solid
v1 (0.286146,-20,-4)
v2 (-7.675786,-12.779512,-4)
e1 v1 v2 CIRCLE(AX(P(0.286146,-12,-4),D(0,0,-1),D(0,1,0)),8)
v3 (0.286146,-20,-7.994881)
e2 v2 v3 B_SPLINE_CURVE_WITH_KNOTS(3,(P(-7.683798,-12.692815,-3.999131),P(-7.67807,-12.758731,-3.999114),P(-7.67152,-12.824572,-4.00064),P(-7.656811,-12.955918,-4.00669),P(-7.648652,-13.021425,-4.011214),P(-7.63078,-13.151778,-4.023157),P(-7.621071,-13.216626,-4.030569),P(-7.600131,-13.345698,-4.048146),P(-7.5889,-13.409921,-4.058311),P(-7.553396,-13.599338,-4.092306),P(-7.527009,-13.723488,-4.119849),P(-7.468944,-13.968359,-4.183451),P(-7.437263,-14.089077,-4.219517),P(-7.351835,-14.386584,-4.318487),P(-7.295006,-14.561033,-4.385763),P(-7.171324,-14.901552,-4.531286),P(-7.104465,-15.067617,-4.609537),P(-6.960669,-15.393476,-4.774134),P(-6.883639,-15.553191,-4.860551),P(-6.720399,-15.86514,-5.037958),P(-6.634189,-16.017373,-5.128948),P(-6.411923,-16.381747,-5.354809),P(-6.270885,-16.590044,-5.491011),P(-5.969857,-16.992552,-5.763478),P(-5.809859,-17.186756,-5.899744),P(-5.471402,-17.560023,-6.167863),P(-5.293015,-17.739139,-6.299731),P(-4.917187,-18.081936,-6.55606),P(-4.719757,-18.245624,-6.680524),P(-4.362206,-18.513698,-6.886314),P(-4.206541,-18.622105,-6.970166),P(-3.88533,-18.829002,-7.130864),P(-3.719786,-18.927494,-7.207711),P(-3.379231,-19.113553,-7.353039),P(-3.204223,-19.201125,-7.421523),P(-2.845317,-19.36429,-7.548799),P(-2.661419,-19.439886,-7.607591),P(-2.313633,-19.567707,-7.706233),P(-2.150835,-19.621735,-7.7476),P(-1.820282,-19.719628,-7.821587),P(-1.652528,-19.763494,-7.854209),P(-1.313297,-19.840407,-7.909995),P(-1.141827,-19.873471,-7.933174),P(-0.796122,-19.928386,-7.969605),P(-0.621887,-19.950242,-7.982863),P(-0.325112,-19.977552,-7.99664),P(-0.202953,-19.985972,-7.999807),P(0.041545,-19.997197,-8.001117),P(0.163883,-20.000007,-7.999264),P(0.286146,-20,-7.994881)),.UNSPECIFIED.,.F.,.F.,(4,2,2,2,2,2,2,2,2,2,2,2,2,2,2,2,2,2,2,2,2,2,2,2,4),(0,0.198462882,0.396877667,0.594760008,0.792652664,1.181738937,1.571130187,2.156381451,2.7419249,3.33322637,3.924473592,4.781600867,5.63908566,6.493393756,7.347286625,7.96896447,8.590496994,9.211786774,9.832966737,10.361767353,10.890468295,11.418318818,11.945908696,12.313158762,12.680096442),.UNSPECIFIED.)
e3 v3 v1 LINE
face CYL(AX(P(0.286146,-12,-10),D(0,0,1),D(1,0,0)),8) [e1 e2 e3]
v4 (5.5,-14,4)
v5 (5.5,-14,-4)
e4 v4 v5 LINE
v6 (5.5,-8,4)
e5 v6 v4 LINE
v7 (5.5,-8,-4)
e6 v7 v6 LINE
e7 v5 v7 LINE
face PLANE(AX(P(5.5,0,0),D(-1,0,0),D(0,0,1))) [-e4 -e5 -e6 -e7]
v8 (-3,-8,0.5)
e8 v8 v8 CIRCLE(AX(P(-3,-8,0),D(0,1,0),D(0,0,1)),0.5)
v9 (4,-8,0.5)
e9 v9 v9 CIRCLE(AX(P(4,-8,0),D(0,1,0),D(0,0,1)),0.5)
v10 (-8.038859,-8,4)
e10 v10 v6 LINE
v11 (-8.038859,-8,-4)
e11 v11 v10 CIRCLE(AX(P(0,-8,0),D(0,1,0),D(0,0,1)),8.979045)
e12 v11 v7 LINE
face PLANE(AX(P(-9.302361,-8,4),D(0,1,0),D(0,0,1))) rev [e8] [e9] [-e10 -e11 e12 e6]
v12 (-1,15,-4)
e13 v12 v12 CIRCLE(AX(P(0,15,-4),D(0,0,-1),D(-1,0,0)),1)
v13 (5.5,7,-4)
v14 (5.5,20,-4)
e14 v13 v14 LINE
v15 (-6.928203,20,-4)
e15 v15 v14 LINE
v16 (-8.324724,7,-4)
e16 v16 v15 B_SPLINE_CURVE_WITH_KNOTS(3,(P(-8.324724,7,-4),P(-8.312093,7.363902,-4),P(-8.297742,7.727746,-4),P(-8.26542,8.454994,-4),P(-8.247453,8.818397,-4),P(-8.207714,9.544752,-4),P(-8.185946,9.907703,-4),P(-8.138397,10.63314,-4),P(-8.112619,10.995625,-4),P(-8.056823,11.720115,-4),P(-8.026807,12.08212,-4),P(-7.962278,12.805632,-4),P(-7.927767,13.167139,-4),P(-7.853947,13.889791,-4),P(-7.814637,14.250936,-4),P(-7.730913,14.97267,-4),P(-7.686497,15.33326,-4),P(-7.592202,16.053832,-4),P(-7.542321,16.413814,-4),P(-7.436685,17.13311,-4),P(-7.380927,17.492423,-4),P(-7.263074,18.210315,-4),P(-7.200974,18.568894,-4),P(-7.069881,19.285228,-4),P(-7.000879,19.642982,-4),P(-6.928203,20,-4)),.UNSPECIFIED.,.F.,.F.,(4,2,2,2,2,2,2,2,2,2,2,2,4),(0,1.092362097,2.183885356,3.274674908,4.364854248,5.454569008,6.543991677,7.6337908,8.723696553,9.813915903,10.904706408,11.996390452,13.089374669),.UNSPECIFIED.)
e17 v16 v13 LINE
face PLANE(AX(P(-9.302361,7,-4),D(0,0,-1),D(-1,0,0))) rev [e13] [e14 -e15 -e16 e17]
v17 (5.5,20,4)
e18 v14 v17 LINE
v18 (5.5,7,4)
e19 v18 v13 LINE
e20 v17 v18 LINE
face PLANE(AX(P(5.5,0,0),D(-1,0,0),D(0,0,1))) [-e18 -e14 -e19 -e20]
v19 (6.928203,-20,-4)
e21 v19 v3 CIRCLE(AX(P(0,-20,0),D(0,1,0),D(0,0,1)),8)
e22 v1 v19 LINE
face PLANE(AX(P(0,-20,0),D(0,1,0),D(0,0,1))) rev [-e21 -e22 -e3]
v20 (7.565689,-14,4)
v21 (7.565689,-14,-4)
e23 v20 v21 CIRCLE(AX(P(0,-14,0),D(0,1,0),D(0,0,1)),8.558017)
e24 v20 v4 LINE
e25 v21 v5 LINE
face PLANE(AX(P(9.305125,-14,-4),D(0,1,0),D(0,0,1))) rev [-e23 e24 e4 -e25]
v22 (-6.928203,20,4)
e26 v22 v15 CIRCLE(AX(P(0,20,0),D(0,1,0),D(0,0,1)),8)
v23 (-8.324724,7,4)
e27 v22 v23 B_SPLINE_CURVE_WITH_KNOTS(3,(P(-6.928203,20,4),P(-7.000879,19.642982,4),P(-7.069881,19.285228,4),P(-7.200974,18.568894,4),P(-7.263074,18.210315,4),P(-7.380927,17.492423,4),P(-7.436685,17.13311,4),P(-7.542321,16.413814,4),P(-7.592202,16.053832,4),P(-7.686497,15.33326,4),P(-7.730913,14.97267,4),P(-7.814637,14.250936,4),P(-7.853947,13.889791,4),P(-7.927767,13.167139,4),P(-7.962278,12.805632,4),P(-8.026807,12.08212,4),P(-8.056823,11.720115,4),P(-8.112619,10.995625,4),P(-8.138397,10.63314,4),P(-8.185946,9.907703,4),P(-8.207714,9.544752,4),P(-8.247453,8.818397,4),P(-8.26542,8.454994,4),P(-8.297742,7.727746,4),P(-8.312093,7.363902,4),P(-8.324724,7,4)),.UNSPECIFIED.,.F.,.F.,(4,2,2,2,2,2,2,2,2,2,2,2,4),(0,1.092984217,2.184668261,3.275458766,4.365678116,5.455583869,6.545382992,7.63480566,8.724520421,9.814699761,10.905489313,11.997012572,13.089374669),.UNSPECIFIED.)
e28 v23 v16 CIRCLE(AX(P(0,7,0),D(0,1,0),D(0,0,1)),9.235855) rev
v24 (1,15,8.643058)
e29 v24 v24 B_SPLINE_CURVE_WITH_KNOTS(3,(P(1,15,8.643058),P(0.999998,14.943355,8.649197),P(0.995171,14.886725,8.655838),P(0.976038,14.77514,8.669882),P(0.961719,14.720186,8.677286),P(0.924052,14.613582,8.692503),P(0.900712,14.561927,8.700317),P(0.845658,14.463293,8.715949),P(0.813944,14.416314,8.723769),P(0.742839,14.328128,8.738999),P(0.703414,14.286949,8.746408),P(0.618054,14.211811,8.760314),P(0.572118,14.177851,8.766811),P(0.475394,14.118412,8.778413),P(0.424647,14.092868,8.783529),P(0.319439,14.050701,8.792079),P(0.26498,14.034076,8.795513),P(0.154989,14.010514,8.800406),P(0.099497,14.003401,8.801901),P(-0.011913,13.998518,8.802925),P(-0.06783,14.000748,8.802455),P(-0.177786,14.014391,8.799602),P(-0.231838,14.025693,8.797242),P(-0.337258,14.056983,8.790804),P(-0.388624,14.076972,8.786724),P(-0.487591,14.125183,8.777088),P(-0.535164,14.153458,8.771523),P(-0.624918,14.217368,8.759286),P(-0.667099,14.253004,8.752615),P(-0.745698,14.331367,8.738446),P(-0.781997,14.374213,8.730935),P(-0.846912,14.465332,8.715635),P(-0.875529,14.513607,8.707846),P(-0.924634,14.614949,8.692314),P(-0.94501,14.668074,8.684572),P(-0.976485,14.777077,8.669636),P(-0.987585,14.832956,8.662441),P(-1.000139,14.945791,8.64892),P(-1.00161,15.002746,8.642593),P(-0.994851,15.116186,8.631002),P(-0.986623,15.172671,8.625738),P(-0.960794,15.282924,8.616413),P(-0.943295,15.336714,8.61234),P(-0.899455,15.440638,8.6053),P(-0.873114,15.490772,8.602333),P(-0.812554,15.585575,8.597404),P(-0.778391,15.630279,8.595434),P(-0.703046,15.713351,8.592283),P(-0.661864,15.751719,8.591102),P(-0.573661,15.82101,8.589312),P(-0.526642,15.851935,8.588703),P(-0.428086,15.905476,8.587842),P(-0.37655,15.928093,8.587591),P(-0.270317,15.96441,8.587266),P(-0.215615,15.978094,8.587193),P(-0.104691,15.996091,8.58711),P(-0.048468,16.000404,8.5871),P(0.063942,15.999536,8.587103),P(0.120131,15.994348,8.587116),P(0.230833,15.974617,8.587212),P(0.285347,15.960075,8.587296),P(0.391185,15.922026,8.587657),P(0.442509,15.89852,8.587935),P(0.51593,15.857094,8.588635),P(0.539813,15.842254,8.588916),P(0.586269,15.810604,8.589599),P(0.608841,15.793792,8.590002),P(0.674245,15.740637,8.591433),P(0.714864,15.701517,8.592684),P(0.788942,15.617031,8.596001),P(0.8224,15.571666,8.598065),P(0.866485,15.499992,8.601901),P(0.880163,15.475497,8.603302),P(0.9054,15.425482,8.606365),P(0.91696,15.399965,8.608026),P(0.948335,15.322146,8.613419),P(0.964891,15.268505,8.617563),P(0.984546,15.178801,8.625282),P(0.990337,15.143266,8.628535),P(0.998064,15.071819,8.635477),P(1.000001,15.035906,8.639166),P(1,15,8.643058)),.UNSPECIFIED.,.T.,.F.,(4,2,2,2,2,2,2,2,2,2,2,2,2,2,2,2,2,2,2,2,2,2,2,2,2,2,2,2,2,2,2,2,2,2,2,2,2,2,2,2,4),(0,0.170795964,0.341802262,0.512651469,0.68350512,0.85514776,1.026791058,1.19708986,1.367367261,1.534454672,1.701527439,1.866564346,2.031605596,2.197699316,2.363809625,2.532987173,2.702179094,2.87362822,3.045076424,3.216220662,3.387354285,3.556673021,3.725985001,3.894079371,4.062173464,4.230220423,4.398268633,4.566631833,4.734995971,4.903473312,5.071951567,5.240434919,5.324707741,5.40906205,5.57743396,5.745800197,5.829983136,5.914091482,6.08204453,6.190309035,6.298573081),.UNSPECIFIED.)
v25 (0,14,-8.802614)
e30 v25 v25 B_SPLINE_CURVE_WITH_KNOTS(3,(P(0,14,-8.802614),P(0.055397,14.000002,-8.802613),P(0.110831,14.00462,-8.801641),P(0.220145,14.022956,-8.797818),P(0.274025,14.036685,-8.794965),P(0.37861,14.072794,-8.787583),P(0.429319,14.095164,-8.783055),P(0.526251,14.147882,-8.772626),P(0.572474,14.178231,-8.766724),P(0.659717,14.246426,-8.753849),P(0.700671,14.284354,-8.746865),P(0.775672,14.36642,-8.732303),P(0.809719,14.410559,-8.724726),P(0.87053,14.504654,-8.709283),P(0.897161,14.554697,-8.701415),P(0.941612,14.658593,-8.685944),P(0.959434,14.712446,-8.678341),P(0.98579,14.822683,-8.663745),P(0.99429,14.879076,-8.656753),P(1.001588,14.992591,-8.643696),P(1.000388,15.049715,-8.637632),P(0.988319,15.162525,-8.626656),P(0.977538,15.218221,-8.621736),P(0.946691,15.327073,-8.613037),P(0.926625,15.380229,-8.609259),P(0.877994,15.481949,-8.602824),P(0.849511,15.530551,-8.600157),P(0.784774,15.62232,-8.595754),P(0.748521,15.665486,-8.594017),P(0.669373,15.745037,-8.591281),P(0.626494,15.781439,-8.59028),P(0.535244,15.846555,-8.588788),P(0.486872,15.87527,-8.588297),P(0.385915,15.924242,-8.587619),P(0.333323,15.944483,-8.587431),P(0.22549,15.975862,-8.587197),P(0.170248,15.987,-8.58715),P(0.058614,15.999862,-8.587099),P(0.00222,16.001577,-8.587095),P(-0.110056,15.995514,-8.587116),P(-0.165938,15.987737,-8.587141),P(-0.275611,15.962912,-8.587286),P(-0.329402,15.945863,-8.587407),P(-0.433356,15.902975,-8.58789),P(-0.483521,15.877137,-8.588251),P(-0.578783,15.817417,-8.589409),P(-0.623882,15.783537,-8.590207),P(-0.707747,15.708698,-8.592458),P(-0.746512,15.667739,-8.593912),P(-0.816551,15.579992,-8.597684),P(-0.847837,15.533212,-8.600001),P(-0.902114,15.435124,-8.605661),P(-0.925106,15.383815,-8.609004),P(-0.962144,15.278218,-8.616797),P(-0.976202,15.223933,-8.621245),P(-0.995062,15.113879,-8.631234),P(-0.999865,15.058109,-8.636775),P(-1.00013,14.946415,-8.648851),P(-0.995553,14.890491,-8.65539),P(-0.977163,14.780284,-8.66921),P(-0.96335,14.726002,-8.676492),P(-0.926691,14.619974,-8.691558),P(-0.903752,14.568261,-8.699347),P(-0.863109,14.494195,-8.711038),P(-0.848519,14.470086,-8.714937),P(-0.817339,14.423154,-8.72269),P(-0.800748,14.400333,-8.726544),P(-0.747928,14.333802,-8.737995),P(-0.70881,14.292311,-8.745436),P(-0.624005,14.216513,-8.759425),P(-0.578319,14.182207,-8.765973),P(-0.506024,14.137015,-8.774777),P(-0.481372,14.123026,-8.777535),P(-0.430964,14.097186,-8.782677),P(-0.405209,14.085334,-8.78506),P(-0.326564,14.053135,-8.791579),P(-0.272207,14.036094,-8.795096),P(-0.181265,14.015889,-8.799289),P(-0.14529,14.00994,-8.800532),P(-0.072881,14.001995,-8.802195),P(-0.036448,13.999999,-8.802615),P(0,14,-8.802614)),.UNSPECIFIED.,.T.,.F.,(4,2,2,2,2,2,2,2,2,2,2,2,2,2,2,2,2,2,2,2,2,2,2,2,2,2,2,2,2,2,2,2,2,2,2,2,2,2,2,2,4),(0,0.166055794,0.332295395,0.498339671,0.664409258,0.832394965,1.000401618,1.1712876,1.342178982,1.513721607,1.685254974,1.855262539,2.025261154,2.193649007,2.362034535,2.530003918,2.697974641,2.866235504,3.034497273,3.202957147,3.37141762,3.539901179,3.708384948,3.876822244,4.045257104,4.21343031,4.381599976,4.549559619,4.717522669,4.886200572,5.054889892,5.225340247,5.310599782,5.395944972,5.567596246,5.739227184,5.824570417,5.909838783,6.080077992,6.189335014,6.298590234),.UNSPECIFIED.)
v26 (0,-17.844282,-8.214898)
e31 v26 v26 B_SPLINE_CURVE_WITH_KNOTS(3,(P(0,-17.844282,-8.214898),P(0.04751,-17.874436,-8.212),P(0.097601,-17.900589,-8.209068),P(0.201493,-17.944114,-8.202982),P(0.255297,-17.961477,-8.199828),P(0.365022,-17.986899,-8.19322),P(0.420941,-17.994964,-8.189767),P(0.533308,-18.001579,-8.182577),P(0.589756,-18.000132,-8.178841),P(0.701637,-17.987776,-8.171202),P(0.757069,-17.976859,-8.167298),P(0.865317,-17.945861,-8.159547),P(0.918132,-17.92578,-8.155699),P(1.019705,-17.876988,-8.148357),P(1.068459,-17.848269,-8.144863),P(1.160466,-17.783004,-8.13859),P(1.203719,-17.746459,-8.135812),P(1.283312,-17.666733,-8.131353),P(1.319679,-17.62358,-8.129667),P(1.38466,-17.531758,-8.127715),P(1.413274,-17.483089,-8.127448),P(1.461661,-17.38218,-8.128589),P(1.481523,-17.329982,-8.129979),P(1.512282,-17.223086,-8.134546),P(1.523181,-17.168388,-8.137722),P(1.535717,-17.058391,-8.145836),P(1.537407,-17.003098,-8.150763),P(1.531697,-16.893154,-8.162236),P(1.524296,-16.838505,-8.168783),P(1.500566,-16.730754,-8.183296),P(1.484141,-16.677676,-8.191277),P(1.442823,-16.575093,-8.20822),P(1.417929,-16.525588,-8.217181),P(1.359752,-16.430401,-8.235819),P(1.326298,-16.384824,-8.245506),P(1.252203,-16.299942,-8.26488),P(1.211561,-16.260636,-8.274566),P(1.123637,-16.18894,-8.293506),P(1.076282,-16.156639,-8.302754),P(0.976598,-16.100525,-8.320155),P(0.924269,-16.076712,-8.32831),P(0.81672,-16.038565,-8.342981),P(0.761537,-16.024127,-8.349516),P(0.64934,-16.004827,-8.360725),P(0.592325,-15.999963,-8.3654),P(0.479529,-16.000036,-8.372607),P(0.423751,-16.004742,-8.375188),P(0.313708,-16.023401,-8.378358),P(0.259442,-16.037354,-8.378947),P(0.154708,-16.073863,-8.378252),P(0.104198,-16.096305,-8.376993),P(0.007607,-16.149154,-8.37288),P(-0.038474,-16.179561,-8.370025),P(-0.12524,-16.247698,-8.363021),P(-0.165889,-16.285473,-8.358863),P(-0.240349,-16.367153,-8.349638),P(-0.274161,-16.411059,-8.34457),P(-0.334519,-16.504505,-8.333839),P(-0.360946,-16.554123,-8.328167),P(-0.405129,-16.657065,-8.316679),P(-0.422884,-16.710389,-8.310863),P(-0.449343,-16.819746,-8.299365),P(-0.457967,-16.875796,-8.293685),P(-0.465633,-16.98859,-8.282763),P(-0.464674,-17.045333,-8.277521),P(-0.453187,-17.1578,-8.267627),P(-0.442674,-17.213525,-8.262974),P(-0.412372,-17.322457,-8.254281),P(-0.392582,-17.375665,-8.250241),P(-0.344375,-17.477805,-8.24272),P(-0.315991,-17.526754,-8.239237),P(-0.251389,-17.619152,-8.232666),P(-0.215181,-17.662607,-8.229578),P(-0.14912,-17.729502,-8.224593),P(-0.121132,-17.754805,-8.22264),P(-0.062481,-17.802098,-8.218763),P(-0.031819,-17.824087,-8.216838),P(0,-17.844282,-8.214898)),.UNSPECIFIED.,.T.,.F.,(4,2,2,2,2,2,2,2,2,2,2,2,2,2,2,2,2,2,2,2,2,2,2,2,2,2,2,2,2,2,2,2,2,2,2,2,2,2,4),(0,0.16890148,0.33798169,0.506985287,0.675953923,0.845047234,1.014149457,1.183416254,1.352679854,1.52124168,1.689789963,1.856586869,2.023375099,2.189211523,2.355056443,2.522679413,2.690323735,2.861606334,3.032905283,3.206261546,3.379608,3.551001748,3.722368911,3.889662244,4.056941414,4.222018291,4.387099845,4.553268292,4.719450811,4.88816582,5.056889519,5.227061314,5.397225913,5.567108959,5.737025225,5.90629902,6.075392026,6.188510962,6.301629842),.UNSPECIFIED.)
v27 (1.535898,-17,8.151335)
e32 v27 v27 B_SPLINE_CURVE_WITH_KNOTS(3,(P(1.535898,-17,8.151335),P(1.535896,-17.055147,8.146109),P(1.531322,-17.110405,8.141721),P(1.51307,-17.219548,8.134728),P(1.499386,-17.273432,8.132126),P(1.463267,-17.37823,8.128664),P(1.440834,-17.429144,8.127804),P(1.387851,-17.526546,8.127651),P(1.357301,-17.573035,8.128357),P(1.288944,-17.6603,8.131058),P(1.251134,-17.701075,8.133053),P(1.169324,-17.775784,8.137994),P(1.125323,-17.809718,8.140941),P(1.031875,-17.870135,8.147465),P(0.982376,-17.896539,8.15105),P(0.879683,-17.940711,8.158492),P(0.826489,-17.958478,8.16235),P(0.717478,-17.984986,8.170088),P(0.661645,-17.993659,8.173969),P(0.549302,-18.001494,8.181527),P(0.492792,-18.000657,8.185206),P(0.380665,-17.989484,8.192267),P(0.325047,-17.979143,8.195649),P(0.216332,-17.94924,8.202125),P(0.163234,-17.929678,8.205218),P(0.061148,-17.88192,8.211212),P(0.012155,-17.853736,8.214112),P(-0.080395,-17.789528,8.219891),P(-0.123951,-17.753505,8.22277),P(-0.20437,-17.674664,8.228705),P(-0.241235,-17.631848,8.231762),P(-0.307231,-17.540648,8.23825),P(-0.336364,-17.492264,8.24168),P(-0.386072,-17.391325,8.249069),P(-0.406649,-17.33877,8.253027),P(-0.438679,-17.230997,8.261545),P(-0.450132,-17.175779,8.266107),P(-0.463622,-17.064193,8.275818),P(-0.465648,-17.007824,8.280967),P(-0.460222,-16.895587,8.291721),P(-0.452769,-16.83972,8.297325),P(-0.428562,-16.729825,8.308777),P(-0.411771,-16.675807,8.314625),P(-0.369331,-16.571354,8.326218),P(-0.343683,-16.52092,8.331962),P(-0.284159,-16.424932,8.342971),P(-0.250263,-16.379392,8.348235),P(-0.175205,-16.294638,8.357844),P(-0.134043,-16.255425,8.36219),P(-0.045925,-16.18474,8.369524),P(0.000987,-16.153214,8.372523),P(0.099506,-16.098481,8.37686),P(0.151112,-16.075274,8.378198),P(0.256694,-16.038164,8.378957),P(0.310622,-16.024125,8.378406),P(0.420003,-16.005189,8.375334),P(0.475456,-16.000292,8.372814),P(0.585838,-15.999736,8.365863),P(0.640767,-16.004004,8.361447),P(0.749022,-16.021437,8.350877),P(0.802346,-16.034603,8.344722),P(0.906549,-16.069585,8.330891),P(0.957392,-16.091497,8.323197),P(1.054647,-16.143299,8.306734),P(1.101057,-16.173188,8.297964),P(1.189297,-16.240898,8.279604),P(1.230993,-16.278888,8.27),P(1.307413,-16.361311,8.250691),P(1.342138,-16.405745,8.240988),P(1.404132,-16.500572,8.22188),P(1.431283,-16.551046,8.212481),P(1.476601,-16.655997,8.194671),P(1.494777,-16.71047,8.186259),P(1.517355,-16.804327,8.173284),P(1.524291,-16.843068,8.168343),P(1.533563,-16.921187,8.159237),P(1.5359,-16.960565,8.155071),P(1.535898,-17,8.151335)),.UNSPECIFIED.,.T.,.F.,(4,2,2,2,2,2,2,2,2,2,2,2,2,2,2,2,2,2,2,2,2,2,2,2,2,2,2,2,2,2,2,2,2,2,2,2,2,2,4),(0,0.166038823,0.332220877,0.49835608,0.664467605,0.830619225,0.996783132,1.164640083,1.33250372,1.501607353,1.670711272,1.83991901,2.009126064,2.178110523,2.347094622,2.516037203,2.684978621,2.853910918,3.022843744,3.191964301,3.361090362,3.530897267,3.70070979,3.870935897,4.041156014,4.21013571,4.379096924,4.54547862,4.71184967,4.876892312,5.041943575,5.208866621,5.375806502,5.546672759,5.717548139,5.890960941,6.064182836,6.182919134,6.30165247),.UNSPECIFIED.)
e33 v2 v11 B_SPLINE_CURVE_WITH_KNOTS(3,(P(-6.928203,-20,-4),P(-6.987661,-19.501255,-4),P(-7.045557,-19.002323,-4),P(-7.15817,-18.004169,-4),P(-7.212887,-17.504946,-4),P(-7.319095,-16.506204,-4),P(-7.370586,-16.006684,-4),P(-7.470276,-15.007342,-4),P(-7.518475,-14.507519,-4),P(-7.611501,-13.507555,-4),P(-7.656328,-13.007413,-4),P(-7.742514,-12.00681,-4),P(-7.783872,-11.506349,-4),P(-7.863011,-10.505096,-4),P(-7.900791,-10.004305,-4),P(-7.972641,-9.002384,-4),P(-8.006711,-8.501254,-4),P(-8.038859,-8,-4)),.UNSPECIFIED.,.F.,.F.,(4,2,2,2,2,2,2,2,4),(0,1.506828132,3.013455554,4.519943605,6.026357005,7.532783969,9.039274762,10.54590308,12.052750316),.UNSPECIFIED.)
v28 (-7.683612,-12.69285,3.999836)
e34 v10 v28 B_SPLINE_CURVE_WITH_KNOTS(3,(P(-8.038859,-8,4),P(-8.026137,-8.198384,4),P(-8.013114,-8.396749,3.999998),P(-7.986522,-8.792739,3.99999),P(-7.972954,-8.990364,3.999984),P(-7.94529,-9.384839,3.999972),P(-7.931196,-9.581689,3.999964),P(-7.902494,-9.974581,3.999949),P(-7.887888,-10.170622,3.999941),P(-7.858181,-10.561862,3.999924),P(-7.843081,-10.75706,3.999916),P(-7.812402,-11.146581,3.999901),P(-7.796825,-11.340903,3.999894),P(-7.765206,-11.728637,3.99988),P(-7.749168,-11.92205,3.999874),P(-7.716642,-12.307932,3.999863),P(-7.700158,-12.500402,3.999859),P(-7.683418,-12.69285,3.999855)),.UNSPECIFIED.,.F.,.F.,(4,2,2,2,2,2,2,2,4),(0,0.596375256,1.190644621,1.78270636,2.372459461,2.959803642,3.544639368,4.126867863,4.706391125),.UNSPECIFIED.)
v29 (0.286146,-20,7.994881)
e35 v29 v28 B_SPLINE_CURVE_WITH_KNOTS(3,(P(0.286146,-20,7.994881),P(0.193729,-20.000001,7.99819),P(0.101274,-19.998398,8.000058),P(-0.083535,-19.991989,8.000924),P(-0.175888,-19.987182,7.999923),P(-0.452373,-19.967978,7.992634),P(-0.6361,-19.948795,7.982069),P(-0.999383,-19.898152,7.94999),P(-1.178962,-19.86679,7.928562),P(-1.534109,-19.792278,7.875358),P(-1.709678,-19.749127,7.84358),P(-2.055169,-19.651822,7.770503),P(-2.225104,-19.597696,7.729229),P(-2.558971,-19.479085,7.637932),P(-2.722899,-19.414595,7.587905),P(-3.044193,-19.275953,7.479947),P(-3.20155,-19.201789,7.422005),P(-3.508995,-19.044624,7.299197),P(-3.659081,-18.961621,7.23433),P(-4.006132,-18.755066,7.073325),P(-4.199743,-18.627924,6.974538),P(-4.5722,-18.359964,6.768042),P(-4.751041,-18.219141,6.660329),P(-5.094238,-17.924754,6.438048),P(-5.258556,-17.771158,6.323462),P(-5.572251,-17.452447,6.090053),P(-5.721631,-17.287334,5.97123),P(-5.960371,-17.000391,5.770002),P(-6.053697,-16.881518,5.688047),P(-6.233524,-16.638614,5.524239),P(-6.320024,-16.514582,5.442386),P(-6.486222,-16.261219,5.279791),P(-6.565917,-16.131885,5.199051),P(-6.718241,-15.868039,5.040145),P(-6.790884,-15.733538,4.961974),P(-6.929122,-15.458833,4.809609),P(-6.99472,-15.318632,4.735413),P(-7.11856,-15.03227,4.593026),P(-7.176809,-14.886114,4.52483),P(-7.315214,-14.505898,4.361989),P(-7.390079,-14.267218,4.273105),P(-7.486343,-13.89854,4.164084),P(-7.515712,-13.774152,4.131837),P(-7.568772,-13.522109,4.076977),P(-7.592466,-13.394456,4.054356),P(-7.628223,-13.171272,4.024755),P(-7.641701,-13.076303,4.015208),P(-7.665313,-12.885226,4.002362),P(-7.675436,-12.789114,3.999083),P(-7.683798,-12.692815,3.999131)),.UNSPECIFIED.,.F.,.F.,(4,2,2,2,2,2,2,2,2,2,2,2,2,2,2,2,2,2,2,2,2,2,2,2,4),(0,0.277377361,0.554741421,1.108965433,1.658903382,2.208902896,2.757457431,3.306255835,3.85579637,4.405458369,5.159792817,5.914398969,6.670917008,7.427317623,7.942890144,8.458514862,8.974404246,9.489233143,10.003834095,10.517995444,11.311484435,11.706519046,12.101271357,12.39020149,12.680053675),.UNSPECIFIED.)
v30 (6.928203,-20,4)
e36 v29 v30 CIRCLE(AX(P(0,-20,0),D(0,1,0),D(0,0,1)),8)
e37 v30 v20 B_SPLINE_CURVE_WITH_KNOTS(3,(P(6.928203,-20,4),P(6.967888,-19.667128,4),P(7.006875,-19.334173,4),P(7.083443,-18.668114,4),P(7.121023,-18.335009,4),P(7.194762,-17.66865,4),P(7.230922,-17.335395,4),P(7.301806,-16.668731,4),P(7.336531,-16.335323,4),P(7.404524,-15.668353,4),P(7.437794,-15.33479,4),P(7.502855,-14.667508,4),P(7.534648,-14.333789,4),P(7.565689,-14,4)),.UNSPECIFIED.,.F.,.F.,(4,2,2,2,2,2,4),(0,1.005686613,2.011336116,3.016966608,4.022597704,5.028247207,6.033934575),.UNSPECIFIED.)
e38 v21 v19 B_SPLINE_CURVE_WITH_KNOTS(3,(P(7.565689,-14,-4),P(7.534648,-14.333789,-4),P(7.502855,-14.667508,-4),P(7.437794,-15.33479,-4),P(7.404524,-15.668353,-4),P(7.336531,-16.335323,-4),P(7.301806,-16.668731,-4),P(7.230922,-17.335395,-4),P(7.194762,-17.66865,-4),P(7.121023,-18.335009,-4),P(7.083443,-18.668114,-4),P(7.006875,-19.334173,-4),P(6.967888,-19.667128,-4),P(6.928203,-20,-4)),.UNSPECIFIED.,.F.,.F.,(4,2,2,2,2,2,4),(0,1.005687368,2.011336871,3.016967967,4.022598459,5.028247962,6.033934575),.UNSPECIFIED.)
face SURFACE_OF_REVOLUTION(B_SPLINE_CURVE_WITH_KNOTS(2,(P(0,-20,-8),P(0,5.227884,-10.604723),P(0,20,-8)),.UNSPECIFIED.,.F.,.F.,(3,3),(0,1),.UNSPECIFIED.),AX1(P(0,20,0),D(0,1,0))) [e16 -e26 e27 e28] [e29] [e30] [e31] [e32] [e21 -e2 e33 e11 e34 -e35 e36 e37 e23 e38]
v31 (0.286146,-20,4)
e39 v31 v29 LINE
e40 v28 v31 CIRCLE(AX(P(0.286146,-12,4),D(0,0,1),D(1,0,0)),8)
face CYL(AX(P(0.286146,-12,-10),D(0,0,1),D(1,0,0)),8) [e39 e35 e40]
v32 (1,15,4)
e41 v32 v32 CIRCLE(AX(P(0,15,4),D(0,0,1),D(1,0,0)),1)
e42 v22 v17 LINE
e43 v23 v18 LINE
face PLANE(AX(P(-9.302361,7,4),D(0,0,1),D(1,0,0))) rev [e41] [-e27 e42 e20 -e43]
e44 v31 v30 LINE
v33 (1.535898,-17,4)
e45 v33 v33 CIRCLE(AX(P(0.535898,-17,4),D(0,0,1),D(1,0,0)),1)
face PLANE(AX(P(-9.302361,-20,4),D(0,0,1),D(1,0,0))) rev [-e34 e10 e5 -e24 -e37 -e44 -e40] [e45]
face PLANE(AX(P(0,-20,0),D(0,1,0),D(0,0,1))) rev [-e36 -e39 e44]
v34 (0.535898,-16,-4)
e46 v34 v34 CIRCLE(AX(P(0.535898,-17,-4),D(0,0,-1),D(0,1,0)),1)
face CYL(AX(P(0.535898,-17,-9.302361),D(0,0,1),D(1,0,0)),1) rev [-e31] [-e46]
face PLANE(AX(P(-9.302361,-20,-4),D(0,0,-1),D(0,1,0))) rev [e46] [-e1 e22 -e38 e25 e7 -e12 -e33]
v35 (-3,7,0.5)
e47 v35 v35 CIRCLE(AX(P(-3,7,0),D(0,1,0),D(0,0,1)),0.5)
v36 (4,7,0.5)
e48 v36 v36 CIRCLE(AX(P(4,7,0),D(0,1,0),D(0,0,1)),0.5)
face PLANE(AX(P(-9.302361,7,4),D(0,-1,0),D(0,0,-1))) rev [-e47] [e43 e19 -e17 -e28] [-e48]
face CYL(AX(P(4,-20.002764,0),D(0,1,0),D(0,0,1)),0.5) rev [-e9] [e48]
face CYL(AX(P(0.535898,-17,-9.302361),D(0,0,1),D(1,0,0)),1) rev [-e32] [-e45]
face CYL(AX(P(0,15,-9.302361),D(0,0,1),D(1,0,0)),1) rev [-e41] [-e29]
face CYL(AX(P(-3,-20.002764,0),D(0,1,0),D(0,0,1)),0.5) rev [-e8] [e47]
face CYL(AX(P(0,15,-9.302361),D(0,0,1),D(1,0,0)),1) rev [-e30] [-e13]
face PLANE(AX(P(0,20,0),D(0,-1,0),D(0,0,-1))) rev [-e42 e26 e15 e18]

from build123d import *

# Parameters (mm, degrees)
CUT_EXTRUDE1_DEPTH      = 5.5
CUT_EXTRUDE1_DEPTH_BACK = 24.938835821
SKETCH2_W               = 8
SKETCH2_H               = 13
SKETCH2_H_2             = 12
CUT_EXTRUDE2_DEPTH      = 24.938835821
CUT_EXTRUDE2_DEPTH_BACK = 24.938835821
SKETCH3_R               = 1
CUT_EXTRUDE4_START      = 10
CUT_EXTRUDE4_DEPTH      = 20
SKETCH6_R               = 0.5
CUT_EXTRUDE5_DEPTH      = 31.03444459
SKETCH7_W               = 8
SKETCH7_H               = 6
CUT_EXTRUDE6_DEPTH      = 27.563957465


with BuildPart() as part:
    # Sketch1 → Revolve1 (revolve)
    with BuildSketch(Plane(origin=(0, 0, 0), x_dir=(0, 0, -1), z_dir=(1, 0, 0))):
        with BuildLine():
            Line((0, 20), (0, -20))
            Line((0, -20), (8, -20))
            add(Edge.make_bspline(
                [(8, 20), (10.604722665, 5.227883705), (8, -20)],
                knots=[0, 0, 0, 1, 1, 1], degree=2))
            Line((8, 20), (0, 20))
        make_face()
    revolve(axis=Axis((0, 20, 0), (0, -1, 0)))

    # Sketch2 → Cut-Extrude1 (cut, two sides: drawn at the far end of the back side and taken through both)
    with BuildSketch(Plane(origin=(0, 0, 0), x_dir=(0, 0, -1), z_dir=(1, 0, 0)).offset(-CUT_EXTRUDE1_DEPTH_BACK)):
        with Locations((0, 13.5)):
            Rectangle(SKETCH2_W, SKETCH2_H)
        with Locations((0, -14)):
            Rectangle(SKETCH2_W, SKETCH2_H_2)
    extrude(amount=CUT_EXTRUDE1_DEPTH + CUT_EXTRUDE1_DEPTH_BACK, mode=Mode.SUBTRACT)

    # Sketch3 → Cut-Extrude2 (cut, two sides: drawn at the far end of the back side and taken through both)
    with BuildSketch(Plane.XY.offset(-CUT_EXTRUDE2_DEPTH_BACK)):
        with Locations((0, 15)):
            Circle(SKETCH3_R)
        with Locations((0.535898385, -17)):
            Circle(SKETCH3_R)
    extrude(amount=CUT_EXTRUDE2_DEPTH + CUT_EXTRUDE2_DEPTH_BACK, mode=Mode.SUBTRACT)

    # Sketch5 → Cut-Extrude4 (cut)
    with BuildSketch(Plane.XY.offset(CUT_EXTRUDE4_START)):
        with BuildLine():
            add(Edge.make_bspline(
                [(-7.683797501, -12.69281547), (-7.471742946, -15.132228264), (-7.218170916, -17.567798425), (-6.92820323, -20)],
                knots=[0.390461667, 0.390461667, 0.390461667, 0.390461667, 1, 1, 1, 1], degree=3))
            Line((-6.92820323, -20), (0.286146459, -20))
            ThreePointArc((0.286146459, -20), (-5.120214435, -17.896716195), (-7.683797501, -12.69281547))
        make_face()
    extrude(amount=-CUT_EXTRUDE4_DEPTH, mode=Mode.SUBTRACT)

    # Sketch6 → Cut-Extrude5 (cut, through all)
    with BuildSketch(Plane(origin=(0, 7, 0), x_dir=(1, 0, 0), z_dir=(0, 1, 0))):
        with Locations((-3, 0)):
            Circle(SKETCH6_R)
        with Locations((4, 0)):
            Circle(SKETCH6_R)
    extrude(amount=-CUT_EXTRUDE5_DEPTH, mode=Mode.SUBTRACT)

    # Sketch7 → Cut-Extrude6 (cut, through all)
    with BuildSketch(Plane.ZY.offset(-5.5)):
        with Locations((0, -17)):
            Rectangle(SKETCH7_W, SKETCH7_H)
    extrude(amount=-CUT_EXTRUDE6_DEPTH, mode=Mode.SUBTRACT)


solid = part.part
